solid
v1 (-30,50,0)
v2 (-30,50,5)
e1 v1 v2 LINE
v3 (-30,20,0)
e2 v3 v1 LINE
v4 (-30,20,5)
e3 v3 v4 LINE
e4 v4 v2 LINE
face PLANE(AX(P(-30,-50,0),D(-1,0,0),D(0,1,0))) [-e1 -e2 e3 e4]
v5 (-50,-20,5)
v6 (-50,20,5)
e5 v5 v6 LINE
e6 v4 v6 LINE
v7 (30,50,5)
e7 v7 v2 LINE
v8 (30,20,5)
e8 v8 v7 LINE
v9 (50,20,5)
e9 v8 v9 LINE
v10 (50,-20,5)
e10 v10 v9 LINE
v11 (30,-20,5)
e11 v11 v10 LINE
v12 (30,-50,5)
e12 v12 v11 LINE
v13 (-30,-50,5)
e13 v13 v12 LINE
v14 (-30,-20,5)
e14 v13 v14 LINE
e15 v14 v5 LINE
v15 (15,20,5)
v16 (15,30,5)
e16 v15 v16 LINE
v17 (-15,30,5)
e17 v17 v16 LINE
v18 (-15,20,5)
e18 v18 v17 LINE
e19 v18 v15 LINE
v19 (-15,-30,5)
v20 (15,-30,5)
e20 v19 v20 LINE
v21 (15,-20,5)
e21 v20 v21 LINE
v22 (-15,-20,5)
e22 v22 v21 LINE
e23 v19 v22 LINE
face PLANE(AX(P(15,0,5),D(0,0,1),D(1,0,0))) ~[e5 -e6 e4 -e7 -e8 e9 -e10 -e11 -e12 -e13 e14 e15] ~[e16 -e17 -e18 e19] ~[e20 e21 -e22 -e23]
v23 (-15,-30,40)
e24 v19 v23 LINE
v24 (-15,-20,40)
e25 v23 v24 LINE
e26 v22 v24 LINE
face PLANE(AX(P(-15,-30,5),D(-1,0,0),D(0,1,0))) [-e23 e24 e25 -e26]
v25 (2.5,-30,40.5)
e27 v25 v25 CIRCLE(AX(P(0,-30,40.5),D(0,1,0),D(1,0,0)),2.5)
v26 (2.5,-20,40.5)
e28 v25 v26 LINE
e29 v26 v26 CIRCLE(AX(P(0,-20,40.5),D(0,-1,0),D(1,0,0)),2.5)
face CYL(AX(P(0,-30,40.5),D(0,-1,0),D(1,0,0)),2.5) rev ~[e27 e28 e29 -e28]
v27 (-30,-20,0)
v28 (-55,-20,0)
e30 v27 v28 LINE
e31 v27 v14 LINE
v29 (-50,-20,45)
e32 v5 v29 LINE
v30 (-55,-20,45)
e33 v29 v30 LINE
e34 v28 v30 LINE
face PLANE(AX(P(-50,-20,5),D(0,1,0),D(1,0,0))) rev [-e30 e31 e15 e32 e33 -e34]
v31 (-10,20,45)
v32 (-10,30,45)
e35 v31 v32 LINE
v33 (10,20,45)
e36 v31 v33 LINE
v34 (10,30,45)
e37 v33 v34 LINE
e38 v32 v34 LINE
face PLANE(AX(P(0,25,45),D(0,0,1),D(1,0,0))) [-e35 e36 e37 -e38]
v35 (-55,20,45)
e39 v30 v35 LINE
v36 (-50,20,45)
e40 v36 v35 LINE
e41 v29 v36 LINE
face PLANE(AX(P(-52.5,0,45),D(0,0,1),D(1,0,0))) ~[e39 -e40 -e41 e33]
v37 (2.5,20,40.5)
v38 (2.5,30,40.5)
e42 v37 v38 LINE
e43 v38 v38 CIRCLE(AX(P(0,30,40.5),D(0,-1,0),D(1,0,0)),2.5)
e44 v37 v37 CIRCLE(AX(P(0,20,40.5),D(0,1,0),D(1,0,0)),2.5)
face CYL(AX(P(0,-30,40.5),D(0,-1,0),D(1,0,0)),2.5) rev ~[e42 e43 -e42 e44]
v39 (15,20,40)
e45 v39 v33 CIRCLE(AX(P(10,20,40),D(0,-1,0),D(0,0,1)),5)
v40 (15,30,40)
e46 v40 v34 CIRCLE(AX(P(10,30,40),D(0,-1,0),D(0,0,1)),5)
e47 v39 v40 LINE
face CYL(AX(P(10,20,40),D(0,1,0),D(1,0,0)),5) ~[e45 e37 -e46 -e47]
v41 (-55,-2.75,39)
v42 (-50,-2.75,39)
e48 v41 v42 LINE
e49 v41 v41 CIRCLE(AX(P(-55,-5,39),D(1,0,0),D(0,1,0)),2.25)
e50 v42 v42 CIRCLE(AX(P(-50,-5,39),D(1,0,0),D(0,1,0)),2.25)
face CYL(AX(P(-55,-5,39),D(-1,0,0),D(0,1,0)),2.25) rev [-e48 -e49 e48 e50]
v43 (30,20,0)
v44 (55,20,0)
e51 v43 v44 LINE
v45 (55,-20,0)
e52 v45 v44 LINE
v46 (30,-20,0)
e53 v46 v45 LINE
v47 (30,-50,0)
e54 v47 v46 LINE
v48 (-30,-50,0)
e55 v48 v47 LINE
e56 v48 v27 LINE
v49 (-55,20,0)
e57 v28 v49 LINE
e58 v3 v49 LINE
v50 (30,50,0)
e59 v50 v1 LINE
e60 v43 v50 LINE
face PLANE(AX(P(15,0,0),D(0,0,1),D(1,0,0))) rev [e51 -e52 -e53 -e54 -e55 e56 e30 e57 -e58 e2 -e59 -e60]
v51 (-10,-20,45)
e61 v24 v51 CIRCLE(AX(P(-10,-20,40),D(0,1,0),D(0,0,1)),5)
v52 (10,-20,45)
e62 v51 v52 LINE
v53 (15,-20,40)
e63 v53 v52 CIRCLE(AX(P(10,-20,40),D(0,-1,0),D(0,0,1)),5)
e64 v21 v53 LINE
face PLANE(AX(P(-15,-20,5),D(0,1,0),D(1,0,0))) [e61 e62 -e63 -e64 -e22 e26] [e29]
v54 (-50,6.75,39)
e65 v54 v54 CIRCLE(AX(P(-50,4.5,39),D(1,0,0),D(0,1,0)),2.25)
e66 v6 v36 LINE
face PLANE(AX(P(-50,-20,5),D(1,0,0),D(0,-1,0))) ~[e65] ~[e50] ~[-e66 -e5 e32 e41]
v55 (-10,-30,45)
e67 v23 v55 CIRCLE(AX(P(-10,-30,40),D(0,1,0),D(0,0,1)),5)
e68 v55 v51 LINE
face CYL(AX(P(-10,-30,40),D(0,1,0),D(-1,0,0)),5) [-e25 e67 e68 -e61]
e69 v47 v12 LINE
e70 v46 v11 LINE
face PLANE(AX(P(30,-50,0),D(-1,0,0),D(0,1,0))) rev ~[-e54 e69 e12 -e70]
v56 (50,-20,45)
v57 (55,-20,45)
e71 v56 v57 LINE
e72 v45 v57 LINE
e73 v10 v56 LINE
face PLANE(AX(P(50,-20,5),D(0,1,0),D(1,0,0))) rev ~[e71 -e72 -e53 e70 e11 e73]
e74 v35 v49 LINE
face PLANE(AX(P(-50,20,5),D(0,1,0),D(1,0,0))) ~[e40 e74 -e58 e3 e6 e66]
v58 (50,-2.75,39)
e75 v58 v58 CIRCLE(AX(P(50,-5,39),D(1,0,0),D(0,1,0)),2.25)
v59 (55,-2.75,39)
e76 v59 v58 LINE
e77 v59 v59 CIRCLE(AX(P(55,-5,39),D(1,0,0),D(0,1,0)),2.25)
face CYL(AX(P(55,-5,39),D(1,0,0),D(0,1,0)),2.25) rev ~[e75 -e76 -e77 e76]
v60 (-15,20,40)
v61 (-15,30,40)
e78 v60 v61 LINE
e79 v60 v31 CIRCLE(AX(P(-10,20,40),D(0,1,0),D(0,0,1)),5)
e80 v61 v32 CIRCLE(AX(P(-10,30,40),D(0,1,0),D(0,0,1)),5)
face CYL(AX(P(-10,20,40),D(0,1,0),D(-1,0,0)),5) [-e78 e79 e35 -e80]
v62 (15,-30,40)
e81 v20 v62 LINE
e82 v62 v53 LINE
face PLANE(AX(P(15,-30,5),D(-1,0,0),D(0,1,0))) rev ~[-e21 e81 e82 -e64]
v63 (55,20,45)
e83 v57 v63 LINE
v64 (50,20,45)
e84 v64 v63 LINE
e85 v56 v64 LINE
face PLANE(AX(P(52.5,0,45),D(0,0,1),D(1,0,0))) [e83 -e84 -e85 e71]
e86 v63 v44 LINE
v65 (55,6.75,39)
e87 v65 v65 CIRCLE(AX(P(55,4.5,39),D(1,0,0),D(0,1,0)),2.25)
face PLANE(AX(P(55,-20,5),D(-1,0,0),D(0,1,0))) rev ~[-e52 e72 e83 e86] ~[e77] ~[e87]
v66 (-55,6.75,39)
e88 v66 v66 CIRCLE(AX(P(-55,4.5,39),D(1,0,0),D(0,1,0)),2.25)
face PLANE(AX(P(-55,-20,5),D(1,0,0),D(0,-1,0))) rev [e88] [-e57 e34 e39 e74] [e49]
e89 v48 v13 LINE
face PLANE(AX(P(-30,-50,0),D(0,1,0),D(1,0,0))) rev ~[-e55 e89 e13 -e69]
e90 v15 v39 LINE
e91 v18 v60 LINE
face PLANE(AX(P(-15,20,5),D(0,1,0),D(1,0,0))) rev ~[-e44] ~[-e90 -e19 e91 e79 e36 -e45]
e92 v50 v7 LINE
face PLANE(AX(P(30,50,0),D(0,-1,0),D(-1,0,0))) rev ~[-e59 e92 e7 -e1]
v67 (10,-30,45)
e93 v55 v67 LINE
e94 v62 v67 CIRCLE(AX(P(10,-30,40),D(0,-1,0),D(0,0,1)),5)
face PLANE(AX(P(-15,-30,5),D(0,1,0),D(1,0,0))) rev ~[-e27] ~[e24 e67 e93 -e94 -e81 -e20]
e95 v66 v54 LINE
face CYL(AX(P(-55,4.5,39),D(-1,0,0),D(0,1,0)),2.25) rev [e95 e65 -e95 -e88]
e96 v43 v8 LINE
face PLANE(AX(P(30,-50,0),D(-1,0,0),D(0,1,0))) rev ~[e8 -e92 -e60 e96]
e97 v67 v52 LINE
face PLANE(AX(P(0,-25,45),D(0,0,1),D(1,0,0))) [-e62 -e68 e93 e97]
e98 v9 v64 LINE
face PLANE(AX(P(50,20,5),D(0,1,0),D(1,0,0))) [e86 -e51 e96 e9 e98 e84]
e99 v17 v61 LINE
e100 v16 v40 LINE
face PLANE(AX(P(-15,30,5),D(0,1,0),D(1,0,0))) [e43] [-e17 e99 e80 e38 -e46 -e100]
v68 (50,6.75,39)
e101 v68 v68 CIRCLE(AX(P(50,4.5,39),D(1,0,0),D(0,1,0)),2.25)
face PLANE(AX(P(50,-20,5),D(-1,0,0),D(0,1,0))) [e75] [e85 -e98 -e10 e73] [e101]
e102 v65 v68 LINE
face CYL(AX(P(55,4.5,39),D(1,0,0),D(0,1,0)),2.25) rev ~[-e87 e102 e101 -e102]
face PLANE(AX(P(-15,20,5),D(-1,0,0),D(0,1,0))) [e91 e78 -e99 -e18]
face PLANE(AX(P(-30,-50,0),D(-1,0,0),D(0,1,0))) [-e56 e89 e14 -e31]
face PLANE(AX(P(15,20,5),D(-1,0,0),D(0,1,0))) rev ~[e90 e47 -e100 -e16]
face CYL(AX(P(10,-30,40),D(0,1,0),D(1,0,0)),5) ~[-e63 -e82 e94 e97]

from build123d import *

# Parameters (mm, degrees)
F0_W      = 30
F0_H      = 100
F1_DEPTH  = 5
F2_W      = 30
F2_H      = 10
F3_DEPTH  = 40
F4_R      = 5
F5_R      = 2.5
F6_DEPTH  = 80.001
F7_W      = 40
F7_H      = 5
F8_DEPTH  = 25
F9_W      = 5
F9_H      = 40
F10_DEPTH = 40
F11_R     = 2.25
F12_DEPTH = 25


with BuildPart() as f1:
    # F0 (on Top) → F1 (new body)
    with BuildSketch(Plane.XY):
        with Locations((-15, 0)):
            Rectangle(F0_W, F0_H)
        with Locations((15, 0)):
            Rectangle(F0_W, F0_H)
    extrude(amount=F1_DEPTH)

    # F2 (on face) → F3 (join)
    with BuildSketch(Plane.XY.offset(5)):
        with Locations((0, 25)):
            Rectangle(F2_W, F2_H)
        with Locations((0, -25)):
            Rectangle(F2_W, F2_H)
    extrude(amount=F3_DEPTH)

    # F4
    f4_edges = [f1.edges().sort_by_distance(p)[0] for p in [
        (-15, -25, 45),
        (15, -25, 45),
        (-15, 25, 45),
        (15, 25, 45),
    ]]
    fillet(f4_edges, radius=F4_R)

    # F5 (on face) → F6 (cut, through all)
    with BuildSketch(Plane.XZ.offset(30)):
        with Locations((0, 40.5)):
            Circle(F5_R)
    extrude(amount=-F6_DEPTH, mode=Mode.SUBTRACT)

    # F7 (on face) → F8 (join)
    with BuildSketch(Plane.YZ.offset(30)):
        with Locations((0, 2.5)):
            Rectangle(F7_W, F7_H)
    extrude(amount=F8_DEPTH)

    # F9 (on face) → F10 (join)
    with BuildSketch(Plane.XY.offset(5)):
        with Locations((52.5, 0)):
            Rectangle(F9_W, F9_H)
    extrude(amount=F10_DEPTH)

    # F11 (on face) → F12 (cut)
    with BuildSketch(Plane.YZ.offset(55)):
        with Locations((-5, 39)):
            Circle(F11_R)
        with Locations((4.5, 39)):
            Circle(F11_R)
    extrude(amount=-F12_DEPTH, mode=Mode.SUBTRACT)

    # F15: F1 across plane


with BuildPart() as f1_1:
    add(f1.part)
    add(f1.part.mirror(Plane(origin=(0, 0, 5.5), x_dir=(0, -1, 0), z_dir=(-1, 0, 0))))


solid = f1_1.part
